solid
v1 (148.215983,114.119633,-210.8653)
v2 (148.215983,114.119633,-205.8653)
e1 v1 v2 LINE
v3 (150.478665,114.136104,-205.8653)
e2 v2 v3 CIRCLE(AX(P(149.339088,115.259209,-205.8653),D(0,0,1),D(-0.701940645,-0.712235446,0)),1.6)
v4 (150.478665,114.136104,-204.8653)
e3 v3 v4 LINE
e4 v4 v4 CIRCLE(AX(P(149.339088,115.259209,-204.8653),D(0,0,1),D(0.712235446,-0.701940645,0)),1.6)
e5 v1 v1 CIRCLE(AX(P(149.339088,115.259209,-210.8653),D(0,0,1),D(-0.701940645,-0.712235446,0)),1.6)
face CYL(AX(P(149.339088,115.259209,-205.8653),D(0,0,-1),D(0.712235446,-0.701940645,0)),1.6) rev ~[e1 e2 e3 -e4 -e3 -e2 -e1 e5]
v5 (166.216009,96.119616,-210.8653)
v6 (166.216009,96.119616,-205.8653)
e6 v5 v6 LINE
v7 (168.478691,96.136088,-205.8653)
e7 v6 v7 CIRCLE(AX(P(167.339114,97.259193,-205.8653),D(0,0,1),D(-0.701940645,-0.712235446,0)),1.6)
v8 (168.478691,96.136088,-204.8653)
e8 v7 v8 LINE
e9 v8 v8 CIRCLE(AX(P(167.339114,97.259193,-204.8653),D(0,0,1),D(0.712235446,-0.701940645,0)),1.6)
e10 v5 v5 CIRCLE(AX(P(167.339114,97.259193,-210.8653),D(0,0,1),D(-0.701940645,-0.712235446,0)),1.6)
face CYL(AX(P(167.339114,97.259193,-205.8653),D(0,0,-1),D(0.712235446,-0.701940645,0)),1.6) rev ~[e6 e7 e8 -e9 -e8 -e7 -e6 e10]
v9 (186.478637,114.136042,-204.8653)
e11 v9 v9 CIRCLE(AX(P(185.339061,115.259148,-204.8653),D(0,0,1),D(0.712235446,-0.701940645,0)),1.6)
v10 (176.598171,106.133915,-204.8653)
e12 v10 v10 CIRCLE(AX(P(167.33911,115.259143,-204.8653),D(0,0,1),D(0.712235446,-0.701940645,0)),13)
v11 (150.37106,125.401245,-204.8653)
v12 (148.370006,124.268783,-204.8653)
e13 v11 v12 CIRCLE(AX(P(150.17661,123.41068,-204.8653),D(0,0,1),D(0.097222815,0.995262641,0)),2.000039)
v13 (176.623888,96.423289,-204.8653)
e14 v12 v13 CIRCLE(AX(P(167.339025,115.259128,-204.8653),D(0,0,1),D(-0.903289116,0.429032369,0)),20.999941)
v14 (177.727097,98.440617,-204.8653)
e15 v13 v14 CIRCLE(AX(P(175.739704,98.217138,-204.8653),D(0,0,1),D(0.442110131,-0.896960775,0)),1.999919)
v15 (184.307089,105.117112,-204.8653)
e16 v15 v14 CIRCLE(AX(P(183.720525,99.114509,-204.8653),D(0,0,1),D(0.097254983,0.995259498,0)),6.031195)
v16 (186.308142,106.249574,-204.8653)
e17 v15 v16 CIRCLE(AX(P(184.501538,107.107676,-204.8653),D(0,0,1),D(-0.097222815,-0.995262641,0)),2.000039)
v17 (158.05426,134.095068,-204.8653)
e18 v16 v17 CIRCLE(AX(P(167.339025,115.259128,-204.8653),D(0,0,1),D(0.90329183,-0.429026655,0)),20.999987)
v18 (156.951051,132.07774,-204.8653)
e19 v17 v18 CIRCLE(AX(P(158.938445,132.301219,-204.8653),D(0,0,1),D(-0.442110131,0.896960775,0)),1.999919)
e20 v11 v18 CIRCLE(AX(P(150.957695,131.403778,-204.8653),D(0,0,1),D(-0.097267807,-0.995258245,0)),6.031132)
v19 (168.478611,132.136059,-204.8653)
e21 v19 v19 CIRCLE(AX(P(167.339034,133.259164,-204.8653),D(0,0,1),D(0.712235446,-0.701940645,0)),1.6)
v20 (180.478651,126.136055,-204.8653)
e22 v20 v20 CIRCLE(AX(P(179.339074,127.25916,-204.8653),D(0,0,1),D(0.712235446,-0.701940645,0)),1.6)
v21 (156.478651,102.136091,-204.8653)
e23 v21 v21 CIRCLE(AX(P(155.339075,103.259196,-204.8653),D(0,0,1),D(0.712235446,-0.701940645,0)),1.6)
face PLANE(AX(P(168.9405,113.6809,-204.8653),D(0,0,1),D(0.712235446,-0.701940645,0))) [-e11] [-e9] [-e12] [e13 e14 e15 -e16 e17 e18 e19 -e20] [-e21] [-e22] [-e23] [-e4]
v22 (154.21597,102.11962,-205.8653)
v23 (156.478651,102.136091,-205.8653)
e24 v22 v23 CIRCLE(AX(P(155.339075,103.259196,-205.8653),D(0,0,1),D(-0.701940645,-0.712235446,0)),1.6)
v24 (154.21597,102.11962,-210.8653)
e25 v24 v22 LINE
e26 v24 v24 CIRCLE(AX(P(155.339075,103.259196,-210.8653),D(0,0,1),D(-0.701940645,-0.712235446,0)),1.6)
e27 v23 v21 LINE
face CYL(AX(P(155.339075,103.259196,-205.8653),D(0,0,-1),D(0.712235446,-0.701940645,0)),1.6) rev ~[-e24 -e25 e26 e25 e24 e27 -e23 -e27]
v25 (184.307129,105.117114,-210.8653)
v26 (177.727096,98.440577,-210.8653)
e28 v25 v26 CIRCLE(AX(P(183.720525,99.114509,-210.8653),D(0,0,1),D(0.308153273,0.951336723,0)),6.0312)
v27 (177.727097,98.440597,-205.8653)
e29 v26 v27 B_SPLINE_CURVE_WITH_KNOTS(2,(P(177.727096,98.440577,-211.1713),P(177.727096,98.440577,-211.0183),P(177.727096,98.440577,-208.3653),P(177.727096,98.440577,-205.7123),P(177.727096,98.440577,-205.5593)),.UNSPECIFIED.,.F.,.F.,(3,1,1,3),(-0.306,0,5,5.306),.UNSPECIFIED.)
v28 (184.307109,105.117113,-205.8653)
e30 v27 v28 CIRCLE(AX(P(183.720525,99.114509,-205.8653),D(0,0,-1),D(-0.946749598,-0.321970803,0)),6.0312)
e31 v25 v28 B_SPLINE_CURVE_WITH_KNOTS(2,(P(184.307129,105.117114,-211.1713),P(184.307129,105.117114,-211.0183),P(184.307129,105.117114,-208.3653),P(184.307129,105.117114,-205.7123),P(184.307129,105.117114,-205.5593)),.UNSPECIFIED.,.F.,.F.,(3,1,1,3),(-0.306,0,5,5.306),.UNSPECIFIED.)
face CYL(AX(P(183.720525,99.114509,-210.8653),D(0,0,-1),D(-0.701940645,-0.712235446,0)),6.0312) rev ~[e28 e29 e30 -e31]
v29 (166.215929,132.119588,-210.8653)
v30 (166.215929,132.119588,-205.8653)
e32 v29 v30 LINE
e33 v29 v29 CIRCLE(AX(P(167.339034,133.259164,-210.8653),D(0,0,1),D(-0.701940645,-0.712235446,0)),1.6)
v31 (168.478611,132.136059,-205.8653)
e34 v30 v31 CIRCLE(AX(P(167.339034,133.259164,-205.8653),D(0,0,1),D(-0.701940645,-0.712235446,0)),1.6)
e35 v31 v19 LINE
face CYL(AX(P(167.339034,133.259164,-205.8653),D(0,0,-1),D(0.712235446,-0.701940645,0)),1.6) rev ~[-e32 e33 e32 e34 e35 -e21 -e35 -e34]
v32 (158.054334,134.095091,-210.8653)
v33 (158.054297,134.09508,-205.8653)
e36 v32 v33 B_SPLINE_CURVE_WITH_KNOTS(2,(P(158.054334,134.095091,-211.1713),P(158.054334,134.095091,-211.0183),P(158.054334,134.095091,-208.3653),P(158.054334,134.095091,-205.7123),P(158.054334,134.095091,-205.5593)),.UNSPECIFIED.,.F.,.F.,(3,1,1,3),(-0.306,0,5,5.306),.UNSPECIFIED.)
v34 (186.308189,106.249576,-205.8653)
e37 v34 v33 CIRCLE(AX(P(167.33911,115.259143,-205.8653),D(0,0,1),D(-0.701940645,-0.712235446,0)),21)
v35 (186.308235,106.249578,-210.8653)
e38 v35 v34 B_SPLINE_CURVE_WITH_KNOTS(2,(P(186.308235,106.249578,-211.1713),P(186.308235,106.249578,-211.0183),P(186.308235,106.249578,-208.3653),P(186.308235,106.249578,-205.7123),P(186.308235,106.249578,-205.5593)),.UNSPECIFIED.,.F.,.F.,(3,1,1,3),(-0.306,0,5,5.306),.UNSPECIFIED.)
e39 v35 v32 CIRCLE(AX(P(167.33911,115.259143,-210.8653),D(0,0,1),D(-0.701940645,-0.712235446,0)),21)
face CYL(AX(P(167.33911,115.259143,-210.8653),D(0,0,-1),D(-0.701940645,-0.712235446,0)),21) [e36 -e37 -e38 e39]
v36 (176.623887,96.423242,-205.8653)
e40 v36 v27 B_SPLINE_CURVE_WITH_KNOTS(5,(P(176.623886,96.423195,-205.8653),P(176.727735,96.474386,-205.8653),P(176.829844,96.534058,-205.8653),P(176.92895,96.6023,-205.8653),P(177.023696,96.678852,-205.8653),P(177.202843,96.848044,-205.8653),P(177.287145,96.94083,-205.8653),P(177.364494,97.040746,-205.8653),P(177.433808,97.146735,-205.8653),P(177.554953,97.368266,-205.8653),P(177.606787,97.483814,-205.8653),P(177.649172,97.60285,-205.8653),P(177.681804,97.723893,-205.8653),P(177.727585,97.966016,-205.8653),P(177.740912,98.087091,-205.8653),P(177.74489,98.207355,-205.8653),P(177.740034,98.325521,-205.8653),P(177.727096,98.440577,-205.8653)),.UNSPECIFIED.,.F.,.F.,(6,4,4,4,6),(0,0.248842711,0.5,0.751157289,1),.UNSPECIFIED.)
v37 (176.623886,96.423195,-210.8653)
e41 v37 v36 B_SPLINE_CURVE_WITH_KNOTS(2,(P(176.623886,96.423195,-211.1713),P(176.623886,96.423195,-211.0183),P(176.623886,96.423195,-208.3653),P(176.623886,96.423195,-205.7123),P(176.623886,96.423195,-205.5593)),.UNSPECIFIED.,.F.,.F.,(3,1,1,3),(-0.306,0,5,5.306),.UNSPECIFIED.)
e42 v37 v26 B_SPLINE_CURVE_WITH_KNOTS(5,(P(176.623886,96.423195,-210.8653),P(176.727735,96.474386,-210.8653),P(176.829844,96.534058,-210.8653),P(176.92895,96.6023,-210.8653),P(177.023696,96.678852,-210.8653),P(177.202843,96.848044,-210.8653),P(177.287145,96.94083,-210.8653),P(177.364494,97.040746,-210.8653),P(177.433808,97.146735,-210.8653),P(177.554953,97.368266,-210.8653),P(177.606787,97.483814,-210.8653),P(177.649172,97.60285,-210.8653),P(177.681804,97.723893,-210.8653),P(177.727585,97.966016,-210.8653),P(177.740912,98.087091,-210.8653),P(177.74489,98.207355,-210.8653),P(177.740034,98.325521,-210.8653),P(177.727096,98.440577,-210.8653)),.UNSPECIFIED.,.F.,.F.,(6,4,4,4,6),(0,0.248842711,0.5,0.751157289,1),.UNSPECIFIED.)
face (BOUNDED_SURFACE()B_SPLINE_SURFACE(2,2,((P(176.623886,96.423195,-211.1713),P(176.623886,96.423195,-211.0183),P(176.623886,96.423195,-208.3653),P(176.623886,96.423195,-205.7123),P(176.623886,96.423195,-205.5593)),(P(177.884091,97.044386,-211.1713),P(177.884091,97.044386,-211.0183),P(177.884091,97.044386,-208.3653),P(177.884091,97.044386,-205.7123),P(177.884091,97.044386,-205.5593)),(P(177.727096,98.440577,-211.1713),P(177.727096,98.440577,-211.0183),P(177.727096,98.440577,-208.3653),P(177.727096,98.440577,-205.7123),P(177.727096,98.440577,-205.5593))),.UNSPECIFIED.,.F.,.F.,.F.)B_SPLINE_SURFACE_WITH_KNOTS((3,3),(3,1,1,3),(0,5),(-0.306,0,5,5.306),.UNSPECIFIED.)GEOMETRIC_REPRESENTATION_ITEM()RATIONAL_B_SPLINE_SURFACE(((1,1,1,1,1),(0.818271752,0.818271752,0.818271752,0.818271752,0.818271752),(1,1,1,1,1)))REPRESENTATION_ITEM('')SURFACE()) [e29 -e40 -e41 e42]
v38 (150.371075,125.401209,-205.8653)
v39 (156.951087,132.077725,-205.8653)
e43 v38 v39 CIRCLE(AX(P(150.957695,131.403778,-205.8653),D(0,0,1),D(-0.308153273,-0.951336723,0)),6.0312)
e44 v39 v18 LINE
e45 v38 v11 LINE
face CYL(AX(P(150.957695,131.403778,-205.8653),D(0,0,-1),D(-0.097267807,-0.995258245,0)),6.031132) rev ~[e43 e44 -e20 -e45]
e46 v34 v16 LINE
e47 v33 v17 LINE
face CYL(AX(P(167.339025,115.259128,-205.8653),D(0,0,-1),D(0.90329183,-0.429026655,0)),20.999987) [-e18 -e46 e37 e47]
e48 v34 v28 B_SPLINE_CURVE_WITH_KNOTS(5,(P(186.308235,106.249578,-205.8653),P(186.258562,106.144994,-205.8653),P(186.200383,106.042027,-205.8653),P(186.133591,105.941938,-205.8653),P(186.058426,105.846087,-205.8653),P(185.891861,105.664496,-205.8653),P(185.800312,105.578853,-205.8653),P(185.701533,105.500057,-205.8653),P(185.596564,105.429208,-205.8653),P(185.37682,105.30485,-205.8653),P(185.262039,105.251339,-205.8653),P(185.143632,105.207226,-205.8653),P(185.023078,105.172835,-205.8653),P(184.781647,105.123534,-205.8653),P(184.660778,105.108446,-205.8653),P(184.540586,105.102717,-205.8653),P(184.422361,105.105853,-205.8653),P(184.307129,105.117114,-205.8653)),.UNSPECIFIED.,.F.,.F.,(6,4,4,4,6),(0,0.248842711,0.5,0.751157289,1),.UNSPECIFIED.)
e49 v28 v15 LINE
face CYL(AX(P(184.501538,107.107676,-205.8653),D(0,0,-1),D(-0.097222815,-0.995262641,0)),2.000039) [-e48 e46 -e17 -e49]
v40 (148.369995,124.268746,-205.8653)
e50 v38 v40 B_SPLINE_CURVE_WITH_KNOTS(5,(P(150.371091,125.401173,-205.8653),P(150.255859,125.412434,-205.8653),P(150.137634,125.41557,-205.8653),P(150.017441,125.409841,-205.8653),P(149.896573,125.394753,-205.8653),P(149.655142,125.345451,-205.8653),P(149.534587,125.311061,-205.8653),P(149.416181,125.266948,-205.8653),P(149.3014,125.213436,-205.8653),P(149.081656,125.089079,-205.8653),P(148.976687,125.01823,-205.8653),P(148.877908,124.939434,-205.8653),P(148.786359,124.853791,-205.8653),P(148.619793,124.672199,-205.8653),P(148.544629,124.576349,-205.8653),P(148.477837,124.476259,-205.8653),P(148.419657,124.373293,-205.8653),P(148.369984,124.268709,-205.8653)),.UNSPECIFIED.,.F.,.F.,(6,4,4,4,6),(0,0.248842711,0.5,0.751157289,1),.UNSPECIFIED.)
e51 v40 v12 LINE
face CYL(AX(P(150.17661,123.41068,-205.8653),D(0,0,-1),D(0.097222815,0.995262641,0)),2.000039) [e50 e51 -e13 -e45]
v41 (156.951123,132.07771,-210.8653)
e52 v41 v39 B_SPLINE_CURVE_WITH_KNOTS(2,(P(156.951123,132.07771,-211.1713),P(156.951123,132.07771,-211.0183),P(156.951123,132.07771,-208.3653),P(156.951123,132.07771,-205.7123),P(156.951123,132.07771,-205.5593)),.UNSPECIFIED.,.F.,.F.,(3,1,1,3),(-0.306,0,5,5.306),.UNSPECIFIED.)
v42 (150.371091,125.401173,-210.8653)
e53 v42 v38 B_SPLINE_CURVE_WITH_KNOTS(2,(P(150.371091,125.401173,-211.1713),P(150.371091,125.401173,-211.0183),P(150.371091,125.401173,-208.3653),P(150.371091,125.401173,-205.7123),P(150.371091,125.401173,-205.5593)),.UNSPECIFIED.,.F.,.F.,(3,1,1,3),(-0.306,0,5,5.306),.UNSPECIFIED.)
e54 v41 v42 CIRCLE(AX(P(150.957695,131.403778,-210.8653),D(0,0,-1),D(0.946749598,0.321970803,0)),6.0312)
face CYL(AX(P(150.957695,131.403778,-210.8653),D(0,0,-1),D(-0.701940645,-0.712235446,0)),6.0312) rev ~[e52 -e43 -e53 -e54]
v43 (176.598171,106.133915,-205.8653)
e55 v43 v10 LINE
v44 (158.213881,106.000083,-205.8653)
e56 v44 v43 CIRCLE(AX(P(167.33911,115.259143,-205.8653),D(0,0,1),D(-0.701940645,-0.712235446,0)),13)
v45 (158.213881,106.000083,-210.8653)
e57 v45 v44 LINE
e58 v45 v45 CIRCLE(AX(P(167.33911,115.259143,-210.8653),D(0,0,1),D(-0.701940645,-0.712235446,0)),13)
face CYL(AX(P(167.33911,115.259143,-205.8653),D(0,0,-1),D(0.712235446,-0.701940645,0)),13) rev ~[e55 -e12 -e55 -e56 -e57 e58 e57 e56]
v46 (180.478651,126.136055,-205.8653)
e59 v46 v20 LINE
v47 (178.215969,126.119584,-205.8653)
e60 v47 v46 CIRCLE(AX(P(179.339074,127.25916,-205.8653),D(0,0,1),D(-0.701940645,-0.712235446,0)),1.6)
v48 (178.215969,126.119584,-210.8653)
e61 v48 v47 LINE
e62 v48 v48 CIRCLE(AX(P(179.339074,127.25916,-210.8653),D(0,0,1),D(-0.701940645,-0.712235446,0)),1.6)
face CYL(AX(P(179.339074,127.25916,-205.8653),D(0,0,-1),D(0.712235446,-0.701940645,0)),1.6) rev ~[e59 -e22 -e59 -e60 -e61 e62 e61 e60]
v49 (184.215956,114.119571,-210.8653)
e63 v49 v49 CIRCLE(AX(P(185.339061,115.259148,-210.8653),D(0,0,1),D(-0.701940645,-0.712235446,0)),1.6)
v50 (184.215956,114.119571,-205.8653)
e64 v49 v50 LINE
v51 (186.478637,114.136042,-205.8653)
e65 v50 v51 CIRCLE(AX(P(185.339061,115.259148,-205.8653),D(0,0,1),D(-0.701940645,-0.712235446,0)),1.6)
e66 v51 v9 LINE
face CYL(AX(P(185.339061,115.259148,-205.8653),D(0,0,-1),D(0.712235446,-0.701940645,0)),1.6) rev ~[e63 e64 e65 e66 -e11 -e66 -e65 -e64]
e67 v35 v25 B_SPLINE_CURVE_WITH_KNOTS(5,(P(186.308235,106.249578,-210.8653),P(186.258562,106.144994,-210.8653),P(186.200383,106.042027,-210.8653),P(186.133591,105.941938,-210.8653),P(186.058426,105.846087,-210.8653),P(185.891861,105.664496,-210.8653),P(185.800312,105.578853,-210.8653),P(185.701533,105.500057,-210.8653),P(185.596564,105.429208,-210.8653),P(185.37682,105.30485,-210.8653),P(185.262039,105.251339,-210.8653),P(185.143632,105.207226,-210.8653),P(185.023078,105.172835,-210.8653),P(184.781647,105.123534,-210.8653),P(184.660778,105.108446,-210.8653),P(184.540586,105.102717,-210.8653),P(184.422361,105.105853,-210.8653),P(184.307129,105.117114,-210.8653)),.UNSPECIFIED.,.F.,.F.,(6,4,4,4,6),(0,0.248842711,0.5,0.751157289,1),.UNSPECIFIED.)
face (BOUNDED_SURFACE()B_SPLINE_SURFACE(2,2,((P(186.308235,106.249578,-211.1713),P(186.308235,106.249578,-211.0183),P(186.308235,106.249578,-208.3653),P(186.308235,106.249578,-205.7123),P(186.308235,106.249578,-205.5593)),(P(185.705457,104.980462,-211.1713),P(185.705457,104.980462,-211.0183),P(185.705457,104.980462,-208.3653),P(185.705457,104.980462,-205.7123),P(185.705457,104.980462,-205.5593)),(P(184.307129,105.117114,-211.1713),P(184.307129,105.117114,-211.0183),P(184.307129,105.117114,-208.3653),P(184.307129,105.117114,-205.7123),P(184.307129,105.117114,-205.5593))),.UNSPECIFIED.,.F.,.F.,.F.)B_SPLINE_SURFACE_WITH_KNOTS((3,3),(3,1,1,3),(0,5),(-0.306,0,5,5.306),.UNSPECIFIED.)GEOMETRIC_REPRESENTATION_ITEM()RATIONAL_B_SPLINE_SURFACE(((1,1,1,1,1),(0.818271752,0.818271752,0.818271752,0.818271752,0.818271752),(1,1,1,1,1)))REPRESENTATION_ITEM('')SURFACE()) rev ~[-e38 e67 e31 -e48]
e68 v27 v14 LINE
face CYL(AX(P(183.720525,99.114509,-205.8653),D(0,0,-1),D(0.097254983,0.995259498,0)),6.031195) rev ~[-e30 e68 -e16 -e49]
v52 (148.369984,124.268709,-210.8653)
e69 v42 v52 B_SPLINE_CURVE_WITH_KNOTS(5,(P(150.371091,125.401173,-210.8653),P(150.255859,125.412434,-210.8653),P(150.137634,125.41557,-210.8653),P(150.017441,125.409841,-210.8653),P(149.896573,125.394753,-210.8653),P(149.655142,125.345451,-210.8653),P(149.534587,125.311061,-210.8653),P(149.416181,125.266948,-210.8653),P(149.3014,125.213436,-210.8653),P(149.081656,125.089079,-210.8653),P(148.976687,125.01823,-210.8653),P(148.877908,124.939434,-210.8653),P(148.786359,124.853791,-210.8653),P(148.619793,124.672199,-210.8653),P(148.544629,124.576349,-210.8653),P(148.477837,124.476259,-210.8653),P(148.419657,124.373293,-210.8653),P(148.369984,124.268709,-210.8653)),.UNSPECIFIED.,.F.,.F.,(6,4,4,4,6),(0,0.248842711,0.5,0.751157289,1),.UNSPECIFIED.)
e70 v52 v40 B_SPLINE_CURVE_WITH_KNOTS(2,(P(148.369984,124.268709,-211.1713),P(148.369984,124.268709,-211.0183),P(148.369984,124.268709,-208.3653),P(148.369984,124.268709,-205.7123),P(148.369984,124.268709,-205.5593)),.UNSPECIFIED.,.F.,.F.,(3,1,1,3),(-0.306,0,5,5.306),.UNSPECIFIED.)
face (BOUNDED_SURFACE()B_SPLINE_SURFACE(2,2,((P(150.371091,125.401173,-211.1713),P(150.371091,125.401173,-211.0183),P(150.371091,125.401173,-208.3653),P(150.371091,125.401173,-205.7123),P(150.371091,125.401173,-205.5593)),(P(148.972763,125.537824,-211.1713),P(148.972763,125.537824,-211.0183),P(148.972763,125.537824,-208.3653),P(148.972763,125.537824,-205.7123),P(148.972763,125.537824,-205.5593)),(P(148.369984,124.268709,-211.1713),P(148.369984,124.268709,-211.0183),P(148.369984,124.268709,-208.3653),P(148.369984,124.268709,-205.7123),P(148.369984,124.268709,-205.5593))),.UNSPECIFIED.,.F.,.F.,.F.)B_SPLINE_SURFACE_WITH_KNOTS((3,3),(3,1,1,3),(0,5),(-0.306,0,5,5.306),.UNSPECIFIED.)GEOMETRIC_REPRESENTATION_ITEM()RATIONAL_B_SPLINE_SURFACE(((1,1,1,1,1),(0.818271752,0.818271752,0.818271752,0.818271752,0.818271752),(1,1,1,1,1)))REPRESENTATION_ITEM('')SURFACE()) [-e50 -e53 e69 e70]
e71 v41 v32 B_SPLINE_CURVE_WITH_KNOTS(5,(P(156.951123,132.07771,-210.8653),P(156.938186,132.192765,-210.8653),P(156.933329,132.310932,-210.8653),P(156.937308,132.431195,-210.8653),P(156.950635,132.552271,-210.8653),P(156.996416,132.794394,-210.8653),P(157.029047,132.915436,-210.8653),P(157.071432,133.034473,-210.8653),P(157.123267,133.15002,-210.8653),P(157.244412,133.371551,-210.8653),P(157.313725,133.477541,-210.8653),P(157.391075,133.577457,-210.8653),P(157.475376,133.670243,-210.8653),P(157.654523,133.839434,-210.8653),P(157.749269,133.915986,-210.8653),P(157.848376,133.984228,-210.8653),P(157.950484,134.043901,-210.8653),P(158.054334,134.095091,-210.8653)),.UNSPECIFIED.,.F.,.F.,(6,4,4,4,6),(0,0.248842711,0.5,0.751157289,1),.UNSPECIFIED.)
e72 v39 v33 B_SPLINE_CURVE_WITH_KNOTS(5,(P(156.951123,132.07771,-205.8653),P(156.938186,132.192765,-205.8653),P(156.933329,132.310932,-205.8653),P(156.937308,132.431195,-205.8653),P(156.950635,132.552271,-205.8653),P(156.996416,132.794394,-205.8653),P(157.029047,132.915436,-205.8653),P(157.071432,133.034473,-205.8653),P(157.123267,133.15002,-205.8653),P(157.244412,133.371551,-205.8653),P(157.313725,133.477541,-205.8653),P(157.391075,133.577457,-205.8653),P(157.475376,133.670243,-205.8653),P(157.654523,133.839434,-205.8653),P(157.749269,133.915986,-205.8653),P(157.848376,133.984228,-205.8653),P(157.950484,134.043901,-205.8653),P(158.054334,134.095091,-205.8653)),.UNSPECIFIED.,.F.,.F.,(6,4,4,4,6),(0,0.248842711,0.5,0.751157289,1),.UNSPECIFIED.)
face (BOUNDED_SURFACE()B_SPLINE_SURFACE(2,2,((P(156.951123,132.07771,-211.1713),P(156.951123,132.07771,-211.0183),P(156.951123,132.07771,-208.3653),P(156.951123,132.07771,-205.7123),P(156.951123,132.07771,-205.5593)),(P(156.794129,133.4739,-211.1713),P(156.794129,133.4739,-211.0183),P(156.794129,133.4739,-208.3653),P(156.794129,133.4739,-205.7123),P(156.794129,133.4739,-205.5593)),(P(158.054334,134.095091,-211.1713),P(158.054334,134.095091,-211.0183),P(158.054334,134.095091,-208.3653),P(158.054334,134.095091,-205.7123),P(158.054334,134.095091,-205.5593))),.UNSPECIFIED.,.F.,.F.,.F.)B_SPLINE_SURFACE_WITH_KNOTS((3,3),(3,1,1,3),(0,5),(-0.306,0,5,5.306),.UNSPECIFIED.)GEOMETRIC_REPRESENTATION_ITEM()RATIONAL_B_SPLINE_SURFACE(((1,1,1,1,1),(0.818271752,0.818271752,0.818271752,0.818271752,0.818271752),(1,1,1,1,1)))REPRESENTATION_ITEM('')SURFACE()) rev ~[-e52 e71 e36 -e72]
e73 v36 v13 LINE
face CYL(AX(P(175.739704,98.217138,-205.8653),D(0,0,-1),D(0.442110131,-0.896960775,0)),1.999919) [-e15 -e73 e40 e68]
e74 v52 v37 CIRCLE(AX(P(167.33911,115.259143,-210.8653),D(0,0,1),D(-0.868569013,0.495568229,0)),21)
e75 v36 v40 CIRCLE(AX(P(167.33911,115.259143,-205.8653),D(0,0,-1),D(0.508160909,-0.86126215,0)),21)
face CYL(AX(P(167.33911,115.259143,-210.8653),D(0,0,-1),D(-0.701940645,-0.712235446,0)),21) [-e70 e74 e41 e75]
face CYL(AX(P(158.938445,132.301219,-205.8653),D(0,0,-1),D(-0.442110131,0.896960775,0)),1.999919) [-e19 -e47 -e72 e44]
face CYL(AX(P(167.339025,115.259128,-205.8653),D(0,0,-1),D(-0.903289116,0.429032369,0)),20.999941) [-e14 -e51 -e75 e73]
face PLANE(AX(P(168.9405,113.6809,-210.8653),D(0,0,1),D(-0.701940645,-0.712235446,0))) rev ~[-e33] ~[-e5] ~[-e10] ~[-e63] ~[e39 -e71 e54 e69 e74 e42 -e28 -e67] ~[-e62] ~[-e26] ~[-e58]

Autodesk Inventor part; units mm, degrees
ref_plane "YZ Plane" through (0, 0, 0) normal (1, 0, 0) x (0, 1, 0)
ref_plane "XZ Plane" through (0, 0, 0) normal (0, 1, 0) x (-1, 0, 0)
ref_plane "작업 평면1" through (168.9405, 113.6809, -210.8653) normal (0, 0, 1) x (-0.7019406, -0.7122354, 0)
sketch "스케치1" plane through (168.9405, 113.6809, -210.8653) normal (0, 0, 1) x (-0.7019406, -0.7122354, 0)
  circle A0 centre (0, -25.2484) radius 3 projected
  circle A1 centre (0, -2.2484) radius 13 projected
  circle A2 centre (-12.6349, 10.5718) radius 1.6 projected
  circle A3 centre (12.6349, -15.0687) radius 1.6 projected
  circle A4 centre (0.1235, 14.7217) radius 1.6 projected
  circle A5 centre (-0.1235, -19.2186) radius 1.6 projected
  circle A6 centre (-16.9701, -2.1249) radius 1.6 projected
  circle A7 centre (16.9701, -2.372) radius 1.6 projected
  circle A8 centre (12.8202, 10.3865) radius 1.6 projected
  circle A9 centre (-12.8202, -14.8834) radius 1.6 projected
  circle A10 centre (0, 20.7516) radius 3 projected
  arc A11 (-2.0317, -50.1272) -> (-0.57, -54.2453) centre (7.4248, -49.0892) ccw projected
  line L0 (0.57, -54.2453) -> (-0.57, -54.2453) projected
  arc A12 (0.57, -54.2453) -> (2.0317, -50.1272) centre (-7.4248, -49.0892) ccw projected
  arc A13 (2.5023, -49.6825) -> (2.0317, -50.1272) centre (2.5287, -50.1818) ccw projected
  arc A14 (2.5023, -49.6825) -> (3.4624, -49.6221) centre (0, -2.2484) ccw projected
  arc A15 (3.9852, -50.0043) -> (3.4624, -49.6221) centre (3.4989, -50.1207) ccw projected
  arc A16 (3.9852, -50.0043) -> (5.9514, -53.9067) centre (13.237, -47.7893) ccw projected
  line L1 (7.0824, -53.7639) -> (5.9514, -53.9067) projected
  arc A17 (7.0824, -53.7639) -> (8.0165, -49.4951) centre (-1.4956, -49.6504) ccw projected
  arc A18 (8.4277, -48.9948) -> (8.0165, -49.4951) centre (8.5164, -49.4869) ccw projected
  arc A19 (8.4277, -48.9948) -> (9.3726, -48.8146) centre (0, -2.2484) ccw projected
  arc A20 (9.9391, -49.1283) -> (9.3726, -48.8146) centre (9.4713, -49.3047) ccw projected
  arc A21 (9.9391, -49.1283) -> (12.379, -52.7535) centre (18.8404, -45.7711) ccw projected
  line L2 (13.4832, -52.47) -> (12.379, -52.7535) projected
  arc A22 (13.4832, -52.47) -> (13.8748, -48.1178) centre (4.4572, -49.4641) ccw projected
  arc A23 (14.2201, -47.5699) -> (13.8748, -48.1178) centre (14.3698, -48.047) ccw projected
  arc A24 (14.2201, -47.5699) -> (15.135, -47.2727) centre (0, -2.2484) ccw projected
  arc A25 (15.7364, -47.5129) -> (15.135, -47.2727) centre (15.2943, -47.7466) ccw projected
  arc A26 (15.7364, -47.5129) -> (18.6114, -50.8037) centre (24.1467, -43.0666) ccw projected
  line L3 (19.6713, -50.3841) -> (18.6114, -50.8037) projected
  arc A27 (19.6713, -50.3841) -> (19.5144, -46.0171) centre (10.3398, -48.5331) ccw projected
  arc A28 (19.7883, -45.4303) -> (19.5144, -46.0171) centre (19.9966, -45.8849) ccw projected
  arc A29 (19.7883, -45.4303) -> (20.6587, -45.0207) centre (0, -2.2484) ccw projected
  arc A30 (21.2854, -45.1837) -> (20.6587, -45.0207) centre (20.8762, -45.471) ccw projected
  arc A31 (21.2854, -45.1837) -> (24.5502, -48.0882) centre (29.0721, -39.7184) ccw projected
  line L4 (25.5492, -47.539) -> (24.5502, -48.0882) projected
  arc A32 (25.5492, -47.539) -> (24.8461, -43.2262) centre (16.0593, -46.8722) ccw projected
  arc A33 (25.0443, -42.6097) -> (24.8461, -43.2262) centre (25.308, -43.0345) ccw projected
  arc A34 (25.0443, -42.6097) -> (25.8566, -42.0942) centre (0, -2.2484) ccw projected
  arc A35 (26.4988, -42.1774) -> (25.8566, -42.0942) centre (26.1288, -42.5137) ccw projected
  arc A36 (26.4988, -42.1774) -> (30.1019, -44.6498) centre (33.5391, -35.7792) ccw projected
  line L5 (31.0241, -43.9798) -> (30.1019, -44.6498) projected
  arc A37 (31.0241, -43.9798) -> (29.7861, -39.789) centre (21.5255, -44.5076) ccw projected
  arc A38 (29.9055, -39.1525) -> (29.7861, -39.789) centre (30.2203, -39.541) ccw projected
  arc A39 (29.9055, -39.1525) -> (30.6467, -38.5393) centre (0, -2.2484) ccw projected
  arc A40 (31.2943, -38.5413) -> (30.6467, -38.5393) centre (30.9693, -38.9213) ccw projected
  arc A41 (31.2943, -38.5413) -> (35.1788, -40.5427) centre (37.4772, -31.3112) ccw projected
  line L6 (36.0098, -39.7623) -> (35.1788, -40.5427) projected
  arc A42 (36.0098, -39.7623) -> (34.2563, -35.7598) centre (26.6522, -41.4765) ccw projected
  arc A43 (34.295, -35.1134) -> (34.2563, -35.7598) centre (34.656, -35.4593) ccw projected
  arc A44 (34.295, -35.1134) -> (34.9535, -34.4121) centre (0, -2.2484) ccw projected
  arc A45 (35.5962, -34.333) -> (34.9535, -34.4121) centre (35.3214, -34.7507) ccw projected
  arc A46 (35.5962, -34.333) -> (39.7009, -35.8317) centre (40.8242, -26.3849) ccw projected
  line L7 (40.4276, -34.9533) -> (39.7009, -35.8317) projected
  arc A47 (40.4276, -34.9533) -> (38.1863, -31.2021) centre (31.3586, -37.8268) ccw projected
  arc A48 (38.1436, -30.5559) -> (38.1863, -31.2021) centre (38.5451, -30.8539) ccw projected
  arc A49 (38.1436, -30.5559) -> (38.7091, -29.7777) centre (0, -2.2484) ccw projected
  arc A50 (39.3368, -29.6186) -> (38.7091, -29.7777) centre (39.1165, -30.0674) ccw projected
  arc A51 (39.3368, -29.6186) -> (43.597, -30.591) centre (43.5274, -21.078) ccw projected
  line L8 (44.2078, -29.6285) -> (43.597, -30.591) projected
  arc A52 (44.2078, -29.6285) -> (41.514, -26.1878) centre (35.5705, -33.616) ccw projected
  arc A53 (41.3907, -25.5521) -> (41.514, -26.1878) centre (41.8264, -25.7974) ccw projected
  arc A54 (41.3907, -25.5521) -> (41.8542, -24.7091) centre (0, -2.2484) ccw projected
  arc A55 (42.457, -24.4725) -> (41.8542, -24.7091) centre (42.2947, -24.9455) ccw projected
  arc A56 (42.457, -24.4725) -> (46.8055, -24.9034) centre (45.5441, -15.4741) ccw projected
  line L9 (47.2909, -23.8719) -> (46.8055, -24.9034) projected
  arc A57 (47.2909, -23.8719) -> (44.1871, -20.7959) centre (39.2214, -28.9105) ccw projected
  arc A58 (43.985, -20.1807) -> (44.1871, -20.7959) centre (44.4481, -20.3694) ccw projected
  arc A59 (43.985, -20.1807) -> (44.3392, -19.2862) centre (0, -2.2484) ccw projected
  arc A60 (44.9076, -18.976) -> (44.3392, -19.2862) centre (44.8059, -19.4656) ccw projected
  arc A61 (44.9076, -18.976) -> (49.2758, -18.8585) centre (46.8426, -9.6616) ccw projected
  line L10 (49.6281, -17.7743) -> (49.2758, -18.8585) projected
  arc A62 (49.6281, -17.7743) -> (46.1633, -15.1116) centre (42.2538, -23.7845) ccw projected
  arc A63 (45.8857, -14.5265) -> (46.1633, -15.1116) centre (46.3687, -14.6557) ccw projected
  arc A64 (45.8857, -14.5265) -> (46.125, -13.5947) centre (0, -2.2484) ccw projected
  arc A65 (46.65, -13.2157) -> (46.125, -13.5947) centre (46.6105, -13.7141) ccw projected
  arc A66 (46.65, -13.2157) -> (50.9691, -12.5516) centre (47.4023, -3.7322) ccw projected
  line L11 (51.1827, -11.4318) -> (50.9691, -12.5516) projected
  arc A67 (51.1827, -11.4318) -> (47.4114, -9.2243) centre (44.6198, -18.3188) ccw projected
  arc A68 (47.0627, -8.6787) -> (47.4114, -9.2243) centre (47.5581, -8.7464) ccw projected
  arc A69 (47.0627, -8.6787) -> (47.1833, -7.7243) centre (0, -2.2484) ccw projected
  arc A70 (47.6567, -7.2824) -> (47.1833, -7.7243) centre (47.68, -7.7819) ccw projected
  arc A71 (47.6567, -7.2824) -> (51.8585, -6.0822) centre (47.2145, 2.2206) ccw projected
  line L12 (51.9301, -4.9445) -> (51.8585, -6.0822) projected
  arc A72 (51.9301, -4.9445) -> (47.9119, -3.2271) centre (46.2821, -12.5998) ccw projected
  arc A73 (47.4976, -2.7294) -> (47.9119, -3.2271) centre (47.9975, -2.7345) ccw projected
  arc A74 (47.4976, -2.7294) -> (47.4976, -1.7674) centre (0, -2.2484) ccw projected
  arc A75 (47.9119, -1.2698) -> (47.4976, -1.7674) centre (47.9975, -1.7624) ccw projected
  arc A76 (47.9119, -1.2698) -> (51.9301, 0.4476) centre (46.2821, 8.1029) ccw projected
  line L13 (51.8585, 1.5853) -> (51.9301, 0.4476) projected
  arc A77 (51.8585, 1.5853) -> (47.6567, 2.7856) centre (47.2145, -6.7175) ccw projected
  arc A78 (47.1833, 3.2274) -> (47.6567, 2.7856) centre (47.68, 3.285) ccw projected
  arc A79 (47.1833, 3.2274) -> (47.0627, 4.1818) centre (0, -2.2484) ccw projected
  arc A80 (47.4114, 4.7275) -> (47.0627, 4.1818) centre (47.5581, 4.2495) ccw projected
  arc A81 (47.4114, 4.7275) -> (51.1827, 6.9349) centre (44.6198, 13.822) ccw projected
  line L14 (50.9691, 8.0547) -> (51.1827, 6.9349) projected
  arc A82 (50.9691, 8.0547) -> (46.65, 8.7188) centre (47.4023, -0.7647) ccw projected
  arc A83 (46.125, 9.0978) -> (46.65, 8.7188) centre (46.6105, 9.2173) ccw projected
  arc A84 (46.125, 9.0978) -> (45.8857, 10.0296) centre (0, -2.2484) ccw projected
  arc A85 (46.1633, 10.6147) -> (45.8857, 10.0296) centre (46.3687, 10.1589) ccw projected
  arc A86 (46.1633, 10.6147) -> (49.6281, 13.2774) centre (42.2538, 19.2876) ccw projected
  line L15 (49.2758, 14.3616) -> (49.6281, 13.2774) projected
  arc A87 (49.2758, 14.3616) -> (44.9076, 14.4792) centre (46.8426, 5.1647) ccw projected
  arc A88 (44.3392, 14.7894) -> (44.9076, 14.4792) centre (44.8059, 14.9687) ccw projected
  arc A89 (44.3392, 14.7894) -> (43.985, 15.6838) centre (0, -2.2484) ccw projected
  arc A90 (44.1871, 16.299) -> (43.985, 15.6838) centre (44.4481, 15.8726) ccw projected
  arc A91 (44.1871, 16.299) -> (47.2909, 19.375) centre (39.2214, 24.4136) ccw projected
  line L16 (46.8055, 20.4065) -> (47.2909, 19.375) projected
  arc A92 (46.8055, 20.4065) -> (42.457, 19.9757) centre (45.5441, 10.9772) ccw projected
  arc A93 (41.8542, 20.2122) -> (42.457, 19.9757) centre (42.2947, 20.4486) ccw projected
  arc A94 (41.8542, 20.2122) -> (41.3907, 21.0552) centre (0, -2.2484) ccw projected
  arc A95 (41.514, 21.6909) -> (41.3907, 21.0552) centre (41.8264, 21.3005) ccw projected
  arc A96 (41.514, 21.6909) -> (44.2078, 25.1316) centre (35.5705, 29.1191) ccw projected
  line L17 (43.597, 26.0941) -> (44.2078, 25.1316) projected
  arc A97 (43.597, 26.0941) -> (39.3368, 25.1217) centre (43.5274, 16.5811) ccw projected
  arc A98 (38.7091, 25.2808) -> (39.3368, 25.1217) centre (39.1165, 25.5706) ccw projected
  arc A99 (38.7091, 25.2808) -> (38.1436, 26.0591) centre (0, -2.2484) ccw projected
  arc A100 (38.1863, 26.7052) -> (38.1436, 26.0591) centre (38.5451, 26.357) ccw projected
  arc A101 (38.1863, 26.7052) -> (40.4276, 30.4564) centre (31.3586, 33.3299) ccw projected
  line L18 (39.7009, 31.3348) -> (40.4276, 30.4564) projected
  arc A102 (39.7009, 31.3348) -> (35.5962, 29.8361) centre (40.8242, 21.888) ccw projected
  arc A103 (34.9535, 29.9152) -> (35.5962, 29.8361) centre (35.3214, 30.2538) ccw projected
  arc A104 (34.9535, 29.9152) -> (34.295, 30.6165) centre (0, -2.2484) ccw projected
  arc A105 (34.2563, 31.2629) -> (34.295, 30.6165) centre (34.656, 30.9625) ccw projected
  arc A106 (34.2563, 31.2629) -> (36.0098, 35.2655) centre (26.6522, 36.9797) ccw projected
  line L19 (35.1788, 36.0458) -> (36.0098, 35.2655) projected
  arc A107 (35.1788, 36.0458) -> (31.2943, 34.0445) centre (37.4772, 26.8143) ccw projected
  arc A108 (30.6467, 34.0425) -> (31.2943, 34.0445) centre (30.9693, 34.4245) ccw projected
  arc A109 (30.6467, 34.0425) -> (29.9055, 34.6557) centre (0, -2.2484) ccw projected
  arc A110 (29.7861, 35.2921) -> (29.9055, 34.6557) centre (30.2203, 35.0441) ccw projected
  arc A111 (29.7861, 35.2921) -> (31.0241, 39.4829) centre (21.5255, 40.0107) ccw projected
  line L20 (30.1019, 40.153) -> (31.0241, 39.4829) projected
  arc A112 (30.1019, 40.153) -> (26.4988, 37.6805) centre (33.5391, 31.2823) ccw projected
  arc A113 (25.8566, 37.5973) -> (26.4988, 37.6805) centre (26.1288, 38.0168) ccw projected
  arc A114 (25.8566, 37.5973) -> (25.0443, 38.1128) centre (0, -2.2484) ccw projected
  arc A115 (24.8461, 38.7293) -> (25.0443, 38.1128) centre (25.308, 38.5377) ccw projected
  arc A116 (24.8461, 38.7293) -> (25.5492, 43.0422) centre (16.0593, 42.3754) ccw projected
  line L21 (24.5502, 43.5914) -> (25.5492, 43.0422) projected
  arc A117 (24.5502, 43.5914) -> (21.2854, 40.6868) centre (29.0721, 35.2215) ccw projected
  arc A118 (20.6587, 40.5238) -> (21.2854, 40.6868) centre (20.8762, 40.9741) ccw projected
  arc A119 (20.6587, 40.5238) -> (19.7883, 40.9334) centre (0, -2.2484) ccw projected
  arc A120 (19.5144, 41.5202) -> (19.7883, 40.9334) centre (19.9966, 41.388) ccw projected
  arc A121 (19.5144, 41.5202) -> (19.6713, 45.8872) centre (10.3398, 44.0363) ccw projected
  line L22 (18.6114, 46.3069) -> (19.6713, 45.8872) projected
  arc A122 (18.6114, 46.3069) -> (15.7364, 43.016) centre (24.1467, 38.5697) ccw projected
  arc A123 (15.135, 42.7758) -> (15.7364, 43.016) centre (15.2943, 43.2497) ccw projected
  arc A124 (15.135, 42.7758) -> (14.2201, 43.0731) centre (0, -2.2484) ccw projected
  arc A125 (13.8748, 43.6209) -> (14.2201, 43.0731) centre (14.3698, 43.5501) ccw projected
  arc A126 (13.8748, 43.6209) -> (13.4832, 47.9731) centre (4.4572, 44.9672) ccw projected
  line L23 (12.379, 48.2566) -> (13.4832, 47.9731) projected
  arc A127 (12.379, 48.2566) -> (9.9391, 44.6314) centre (18.8404, 41.2742) ccw projected
  arc A128 (9.3726, 44.3177) -> (9.9391, 44.6314) centre (9.4713, 44.8079) ccw projected
  arc A129 (9.3726, 44.3177) -> (8.4277, 44.4979) centre (0, -2.2484) ccw projected
  arc A130 (8.0165, 44.9982) -> (8.4277, 44.4979) centre (8.5164, 44.99) ccw projected
  arc A131 (8.0165, 44.9982) -> (7.0824, 49.267) centre (-1.4956, 45.1535) ccw projected
  line L24 (5.9514, 49.4099) -> (7.0824, 49.267) projected
  arc A132 (5.9514, 49.4099) -> (3.9852, 45.5074) centre (13.237, 43.2924) ccw projected
  arc A133 (3.4624, 45.1252) -> (3.9852, 45.5074) centre (3.4989, 45.6239) ccw projected
  arc A134 (3.4624, 45.1252) -> (2.5023, 45.1856) centre (0, -2.2484) ccw projected
  arc A135 (2.0317, 45.6304) -> (2.5023, 45.1856) centre (2.5287, 45.6849) ccw projected
  arc A136 (2.0317, 45.6304) -> (0.57, 49.7484) centre (-7.4248, 44.5923) ccw projected
  line L25 (-0.57, 49.7484) -> (0.57, 49.7484) projected
  arc A137 (-0.57, 49.7484) -> (-2.0317, 45.6304) centre (7.4248, 44.5923) ccw projected
  arc A138 (-2.5023, 45.1856) -> (-2.0317, 45.6304) centre (-2.5287, 45.6849) ccw projected
  arc A139 (-2.5023, 45.1856) -> (-3.4624, 45.1252) centre (0, -2.2484) ccw projected
  arc A140 (-3.9852, 45.5074) -> (-3.4624, 45.1252) centre (-3.4989, 45.6239) ccw projected
  arc A141 (-3.9852, 45.5074) -> (-5.9514, 49.4099) centre (-13.237, 43.2924) ccw projected
  line L26 (-7.0824, 49.267) -> (-5.9514, 49.4099) projected
  arc A142 (-7.0824, 49.267) -> (-8.0165, 44.9982) centre (1.4956, 45.1535) ccw projected
  arc A143 (-8.4277, 44.4979) -> (-8.0165, 44.9982) centre (-8.5164, 44.99) ccw projected
  arc A144 (-8.4277, 44.4979) -> (-9.3726, 44.3177) centre (0, -2.2484) ccw projected
  arc A145 (-9.9391, 44.6314) -> (-9.3726, 44.3177) centre (-9.4713, 44.8079) ccw projected
  arc A146 (-9.9391, 44.6314) -> (-12.379, 48.2566) centre (-18.8404, 41.2742) ccw projected
  line L27 (-13.4832, 47.9731) -> (-12.379, 48.2566) projected
  arc A147 (-13.4832, 47.9731) -> (-13.8748, 43.6209) centre (-4.4572, 44.9672) ccw projected
  arc A148 (-14.2201, 43.0731) -> (-13.8748, 43.6209) centre (-14.3698, 43.5501) ccw projected
  arc A149 (-14.2201, 43.0731) -> (-15.135, 42.7758) centre (0, -2.2484) ccw projected
  arc A150 (-15.7364, 43.016) -> (-15.135, 42.7758) centre (-15.2943, 43.2497) ccw projected
  arc A151 (-15.7364, 43.016) -> (-18.6114, 46.3069) centre (-24.1467, 38.5697) ccw projected
  line L28 (-19.6713, 45.8872) -> (-18.6114, 46.3069) projected
  arc A152 (-19.6713, 45.8872) -> (-19.5144, 41.5202) centre (-10.3398, 44.0363) ccw projected
  arc A153 (-19.7883, 40.9334) -> (-19.5144, 41.5202) centre (-19.9966, 41.388) ccw projected
  arc A154 (-19.7883, 40.9334) -> (-20.6587, 40.5238) centre (0, -2.2484) ccw projected
  arc A155 (-21.2854, 40.6868) -> (-20.6587, 40.5238) centre (-20.8762, 40.9741) ccw projected
  arc A156 (-21.2854, 40.6868) -> (-24.5502, 43.5914) centre (-29.0721, 35.2215) ccw projected
  line L29 (-25.5492, 43.0422) -> (-24.5502, 43.5914) projected
  arc A157 (-25.5492, 43.0422) -> (-24.8461, 38.7293) centre (-16.0593, 42.3754) ccw projected
  arc A158 (-25.0443, 38.1128) -> (-24.8461, 38.7293) centre (-25.308, 38.5377) ccw projected
  arc A159 (-25.0443, 38.1128) -> (-25.8566, 37.5973) centre (0, -2.2484) ccw projected
  arc A160 (-26.4988, 37.6805) -> (-25.8566, 37.5973) centre (-26.1288, 38.0168) ccw projected
  arc A161 (-26.4988, 37.6805) -> (-30.1019, 40.153) centre (-33.5391, 31.2823) ccw projected
  line L30 (-31.0241, 39.4829) -> (-30.1019, 40.153) projected
  arc A162 (-31.0241, 39.4829) -> (-29.7861, 35.2921) centre (-21.5255, 40.0107) ccw projected
  arc A163 (-29.9055, 34.6557) -> (-29.7861, 35.2921) centre (-30.2203, 35.0441) ccw projected
  arc A164 (-29.9055, 34.6557) -> (-30.6467, 34.0425) centre (0, -2.2484) ccw projected
  arc A165 (-31.2943, 34.0445) -> (-30.6467, 34.0425) centre (-30.9693, 34.4245) ccw projected
  arc A166 (-31.2943, 34.0445) -> (-35.1788, 36.0458) centre (-37.4772, 26.8143) ccw projected
  line L31 (-36.0098, 35.2655) -> (-35.1788, 36.0458) projected
  arc A167 (-36.0098, 35.2655) -> (-34.2563, 31.2629) centre (-26.6522, 36.9797) ccw projected
  arc A168 (-34.295, 30.6165) -> (-34.2563, 31.2629) centre (-34.656, 30.9625) ccw projected
  arc A169 (-34.295, 30.6165) -> (-34.9535, 29.9152) centre (0, -2.2484) ccw projected
  arc A170 (-35.5962, 29.8361) -> (-34.9535, 29.9152) centre (-35.3214, 30.2538) ccw projected
  arc A171 (-35.5962, 29.8361) -> (-39.7009, 31.3348) centre (-40.8242, 21.888) ccw projected
  line L32 (-40.4276, 30.4564) -> (-39.7009, 31.3348) projected
  arc A172 (-40.4276, 30.4564) -> (-38.1863, 26.7052) centre (-31.3586, 33.3299) ccw projected
  arc A173 (-38.1436, 26.0591) -> (-38.1863, 26.7052) centre (-38.5451, 26.357) ccw projected
  arc A174 (-38.1436, 26.0591) -> (-38.7091, 25.2808) centre (0, -2.2484) ccw projected
  arc A175 (-39.3368, 25.1217) -> (-38.7091, 25.2808) centre (-39.1165, 25.5706) ccw projected
  arc A176 (-39.3368, 25.1217) -> (-43.597, 26.0941) centre (-43.5274, 16.5811) ccw projected
  line L33 (-44.2078, 25.1316) -> (-43.597, 26.0941) projected
  arc A177 (-44.2078, 25.1316) -> (-41.514, 21.6909) centre (-35.5705, 29.1191) ccw projected
  arc A178 (-41.3907, 21.0552) -> (-41.514, 21.6909) centre (-41.8264, 21.3005) ccw projected
  arc A179 (-41.3907, 21.0552) -> (-41.8542, 20.2122) centre (0, -2.2484) ccw projected
  arc A180 (-42.457, 19.9757) -> (-41.8542, 20.2122) centre (-42.2947, 20.4486) ccw projected
  arc A181 (-42.457, 19.9757) -> (-46.8055, 20.4065) centre (-45.5441, 10.9772) ccw projected
  line L34 (-47.2909, 19.375) -> (-46.8055, 20.4065) projected
  arc A182 (-47.2909, 19.375) -> (-44.1871, 16.299) centre (-39.2214, 24.4136) ccw projected
  arc A183 (-43.985, 15.6838) -> (-44.1871, 16.299) centre (-44.4481, 15.8726) ccw projected
  arc A184 (-43.985, 15.6838) -> (-44.3392, 14.7894) centre (0, -2.2484) ccw projected
  arc A185 (-44.9076, 14.4792) -> (-44.3392, 14.7894) centre (-44.8059, 14.9687) ccw projected
  arc A186 (-44.9076, 14.4792) -> (-49.2758, 14.3616) centre (-46.8426, 5.1647) ccw projected
  line L35 (-49.6281, 13.2774) -> (-49.2758, 14.3616) projected
  arc A187 (-49.6281, 13.2774) -> (-46.1633, 10.6147) centre (-42.2538, 19.2876) ccw projected
  arc A188 (-45.8857, 10.0296) -> (-46.1633, 10.6147) centre (-46.3687, 10.1589) ccw projected
  arc A189 (-45.8857, 10.0296) -> (-46.125, 9.0978) centre (0, -2.2484) ccw projected
  arc A190 (-46.65, 8.7188) -> (-46.125, 9.0978) centre (-46.6105, 9.2173) ccw projected
  arc A191 (-46.65, 8.7188) -> (-50.9691, 8.0547) centre (-47.4023, -0.7647) ccw projected
  line L36 (-51.1827, 6.9349) -> (-50.9691, 8.0547) projected
  arc A192 (-51.1827, 6.9349) -> (-47.4114, 4.7275) centre (-44.6198, 13.822) ccw projected
  arc A193 (-47.0627, 4.1818) -> (-47.4114, 4.7275) centre (-47.5581, 4.2495) ccw projected
  arc A194 (-47.0627, 4.1818) -> (-47.1833, 3.2274) centre (0, -2.2484) ccw projected
  arc A195 (-47.6567, 2.7856) -> (-47.1833, 3.2274) centre (-47.68, 3.285) ccw projected
  arc A196 (-47.6567, 2.7856) -> (-51.8585, 1.5853) centre (-47.2145, -6.7175) ccw projected
  line L37 (-51.9301, 0.4476) -> (-51.8585, 1.5853) projected
  arc A197 (-51.9301, 0.4476) -> (-47.9119, -1.2698) centre (-46.2821, 8.1029) ccw projected
  arc A198 (-47.4976, -1.7674) -> (-47.9119, -1.2698) centre (-47.9975, -1.7624) ccw projected
  arc A199 (-47.4976, -1.7674) -> (-47.4976, -2.7294) centre (0, -2.2484) ccw projected
  arc A200 (-47.9119, -3.2271) -> (-47.4976, -2.7294) centre (-47.9975, -2.7345) ccw projected
  arc A201 (-47.9119, -3.2271) -> (-51.9301, -4.9445) centre (-46.2821, -12.5998) ccw projected
  line L38 (-51.8585, -6.0822) -> (-51.9301, -4.9445) projected
  arc A202 (-51.8585, -6.0822) -> (-47.6567, -7.2824) centre (-47.2145, 2.2206) ccw projected
  arc A203 (-47.1833, -7.7243) -> (-47.6567, -7.2824) centre (-47.68, -7.7819) ccw projected
  arc A204 (-47.1833, -7.7243) -> (-47.0627, -8.6787) centre (0, -2.2484) ccw projected
  arc A205 (-47.4114, -9.2243) -> (-47.0627, -8.6787) centre (-47.5581, -8.7464) ccw projected
  arc A206 (-47.4114, -9.2243) -> (-51.1827, -11.4318) centre (-44.6198, -18.3188) ccw projected
  line L39 (-50.9691, -12.5516) -> (-51.1827, -11.4318) projected
  arc A207 (-50.9691, -12.5516) -> (-46.65, -13.2157) centre (-47.4023, -3.7322) ccw projected
  arc A208 (-46.125, -13.5947) -> (-46.65, -13.2157) centre (-46.6105, -13.7141) ccw projected
  arc A209 (-46.125, -13.5947) -> (-45.8857, -14.5265) centre (0, -2.2484) ccw projected
  arc A210 (-46.1633, -15.1116) -> (-45.8857, -14.5265) centre (-46.3687, -14.6557) ccw projected
  arc A211 (-46.1633, -15.1116) -> (-49.6281, -17.7743) centre (-42.2538, -23.7845) ccw projected
  line L40 (-49.2758, -18.8585) -> (-49.6281, -17.7743) projected
  arc A212 (-49.2758, -18.8585) -> (-44.9076, -18.976) centre (-46.8426, -9.6616) ccw projected
  arc A213 (-44.3392, -19.2862) -> (-44.9076, -18.976) centre (-44.8059, -19.4656) ccw projected
  arc A214 (-44.3392, -19.2862) -> (-43.985, -20.1807) centre (0, -2.2484) ccw projected
  arc A215 (-44.1871, -20.7959) -> (-43.985, -20.1807) centre (-44.4481, -20.3694) ccw projected
  arc A216 (-44.1871, -20.7959) -> (-47.2909, -23.8719) centre (-39.2214, -28.9105) ccw projected
  line L41 (-46.8055, -24.9034) -> (-47.2909, -23.8719) projected
  arc A217 (-46.8055, -24.9034) -> (-42.457, -24.4725) centre (-45.5441, -15.4741) ccw projected
  arc A218 (-41.8542, -24.7091) -> (-42.457, -24.4725) centre (-42.2947, -24.9455) ccw projected
  arc A219 (-41.8542, -24.7091) -> (-41.3907, -25.5521) centre (0, -2.2484) ccw projected
  arc A220 (-41.514, -26.1878) -> (-41.3907, -25.5521) centre (-41.8264, -25.7974) ccw projected
  arc A221 (-41.514, -26.1878) -> (-44.2078, -29.6285) centre (-35.5705, -33.616) ccw projected
  line L42 (-43.597, -30.591) -> (-44.2078, -29.6285) projected
  arc A222 (-43.597, -30.591) -> (-39.3368, -29.6186) centre (-43.5274, -21.078) ccw projected
  arc A223 (-38.7091, -29.7777) -> (-39.3368, -29.6186) centre (-39.1165, -30.0674) ccw projected
  arc A224 (-38.7091, -29.7777) -> (-38.1436, -30.5559) centre (0, -2.2484) ccw projected
  arc A225 (-38.1863, -31.2021) -> (-38.1436, -30.5559) centre (-38.5451, -30.8539) ccw projected
  arc A226 (-38.1863, -31.2021) -> (-40.4276, -34.9533) centre (-31.3586, -37.8268) ccw projected
  line L43 (-39.7009, -35.8317) -> (-40.4276, -34.9533) projected
  arc A227 (-39.7009, -35.8317) -> (-35.5962, -34.333) centre (-40.8242, -26.3849) ccw projected
  arc A228 (-34.9535, -34.4121) -> (-35.5962, -34.333) centre (-35.3214, -34.7507) ccw projected
  arc A229 (-34.9535, -34.4121) -> (-34.295, -35.1134) centre (0, -2.2484) ccw projected
  arc A230 (-34.2563, -35.7598) -> (-34.295, -35.1134) centre (-34.656, -35.4593) ccw projected
  arc A231 (-34.2563, -35.7598) -> (-36.0098, -39.7623) centre (-26.6522, -41.4765) ccw projected
  line L44 (-35.1788, -40.5427) -> (-36.0098, -39.7623) projected
  arc A232 (-35.1788, -40.5427) -> (-31.2943, -38.5413) centre (-37.4772, -31.3112) ccw projected
  arc A233 (-30.6467, -38.5393) -> (-31.2943, -38.5413) centre (-30.9693, -38.9213) ccw projected
  arc A234 (-30.6467, -38.5393) -> (-29.9055, -39.1525) centre (0, -2.2484) ccw projected
  arc A235 (-29.7861, -39.789) -> (-29.9055, -39.1525) centre (-30.2203, -39.541) ccw projected
  arc A236 (-29.7861, -39.789) -> (-31.0241, -43.9798) centre (-21.5255, -44.5076) ccw projected
  line L45 (-30.1019, -44.6498) -> (-31.0241, -43.9798) projected
  arc A237 (-30.1019, -44.6498) -> (-26.4988, -42.1774) centre (-33.5391, -35.7792) ccw projected
  arc A238 (-25.8566, -42.0942) -> (-26.4988, -42.1774) centre (-26.1288, -42.5137) ccw projected
  arc A239 (-25.8566, -42.0942) -> (-25.0443, -42.6097) centre (0, -2.2484) ccw projected
  arc A240 (-24.8461, -43.2262) -> (-25.0443, -42.6097) centre (-25.308, -43.0345) ccw projected
  arc A241 (-24.8461, -43.2262) -> (-25.5492, -47.539) centre (-16.0593, -46.8722) ccw projected
  line L46 (-24.5502, -48.0882) -> (-25.5492, -47.539) projected
  arc A242 (-24.5502, -48.0882) -> (-21.2854, -45.1837) centre (-29.0721, -39.7184) ccw projected
  arc A243 (-20.6587, -45.0207) -> (-21.2854, -45.1837) centre (-20.8762, -45.471) ccw projected
  arc A244 (-20.6587, -45.0207) -> (-19.7883, -45.4303) centre (0, -2.2484) ccw projected
  arc A245 (-19.5144, -46.0171) -> (-19.7883, -45.4303) centre (-19.9966, -45.8849) ccw projected
  arc A246 (-19.5144, -46.0171) -> (-19.6713, -50.3841) centre (-10.3398, -48.5331) ccw projected
  line L47 (-18.6114, -50.8037) -> (-19.6713, -50.3841) projected
  arc A247 (-18.6114, -50.8037) -> (-15.7364, -47.5129) centre (-24.1467, -43.0666) ccw projected
  arc A248 (-15.135, -47.2727) -> (-15.7364, -47.5129) centre (-15.2943, -47.7466) ccw projected
  arc A249 (-15.135, -47.2727) -> (-14.2201, -47.5699) centre (0, -2.2484) ccw projected
  arc A250 (-13.8748, -48.1178) -> (-14.2201, -47.5699) centre (-14.3698, -48.047) ccw projected
  arc A251 (-13.8748, -48.1178) -> (-13.4832, -52.47) centre (-4.4572, -49.4641) ccw projected
  line L48 (-12.379, -52.7535) -> (-13.4832, -52.47) projected
  arc A252 (-12.379, -52.7535) -> (-9.9391, -49.1283) centre (-18.8404, -45.7711) ccw projected
  arc A253 (-9.3726, -48.8146) -> (-9.9391, -49.1283) centre (-9.4713, -49.3047) ccw projected
  arc A254 (-9.3726, -48.8146) -> (-8.4277, -48.9948) centre (0, -2.2484) ccw projected
  arc A255 (-8.0165, -49.4951) -> (-8.4277, -48.9948) centre (-8.5164, -49.4869) ccw projected
  arc A256 (-8.0165, -49.4951) -> (-7.0824, -53.7639) centre (1.4956, -49.6504) ccw projected
  line L49 (-5.9514, -53.9067) -> (-7.0824, -53.7639) projected
  arc A257 (-5.9514, -53.9067) -> (-3.9852, -50.0043) centre (-13.237, -47.7893) ccw projected
  arc A258 (-3.4624, -49.6221) -> (-3.9852, -50.0043) centre (-3.4989, -50.1207) ccw projected
  arc A259 (-3.4624, -49.6221) -> (-2.5023, -49.6825) centre (0, -2.2484) ccw projected
  arc A260 (-2.0317, -50.1272) -> (-2.5023, -49.6825) centre (-2.5287, -50.1818) ccw projected
  circle A261 centre (0, -2.2484) radius 21
  circle A262 centre (0, 20.7516) radius 6.0312
  circle A263 centre (0, -25.2484) radius 6.0312
  point P0 (-5.3911, -22.5446)
  point P1 (5.3911, -22.5446)
  point P2 (5.3911, 18.0478)
  point P3 (-5.3911, 18.0478)
  dimension "d0" = 42
extrude "돌출1" add sketch "스케치1" along normal blind 5 contours A263 A5 A261 A262 A4 | A263 A5 | A262 A4 picked at (-0.1641, -18.7025) picked at (0.0932, 14.205)
fillet "모깎기1" radius 2 4 edges at (185.5791, 104.8522, -208.3653) (178.0106, 97.1727, -208.3653) (149.0992, 125.6661, -208.3653) (156.6677, 133.3456, -208.3653)
sketch "스케치2" plane through (168.9405, 113.6809, -205.8653) normal (0, 0, 1) x (0.7122354, -0.7019406, 0)
  arc A0 (-22.0831, 6.8982) -> (-21.4528, 4.687) centre (-20.1941, 6.2412) ccw projected
  arc A1 (-21.4528, -4.687) -> (-21.4528, 4.687) centre (-25.2484, 0) ccw projected
  arc A2 (-21.4528, -4.687) -> (-22.0831, -6.8982) centre (-20.1941, -6.2412) ccw projected
  arc A3 (-22.0831, -6.8982) -> (17.5862, -6.8982) centre (-2.2484, 0) ccw projected
  arc A4 (17.5862, -6.8982) -> (16.9559, -4.687) centre (15.6972, -6.2412) ccw projected
  arc A5 (16.9559, 4.687) -> (16.9559, -4.687) centre (20.7516, 0) ccw projected
  arc A6 (16.9559, 4.687) -> (17.5862, 6.8982) centre (15.6972, 6.2412) ccw projected
  arc A7 (17.5862, 6.8982) -> (-22.0831, 6.8982) centre (-2.2484, 0) ccw projected
  circle A8 centre (-14.8834, 12.8202) radius 1.6 projected
  circle A9 centre (10.3865, -12.8202) radius 1.6 projected
  circle A10 centre (-2.372, -16.9701) radius 1.6 projected
  circle A11 centre (-2.1249, 16.9701) radius 1.6 projected
  circle A12 centre (-15.0687, -12.6349) radius 1.6 projected
  circle A13 centre (10.5718, 12.6349) radius 1.6 projected
  circle A14 centre (-2.2484, 0) radius 13 projected
extrude "돌출2" add sketch "스케치2" along normal blind 1
properties part number "큰기어 와셔" material "알루미늄 6061"
